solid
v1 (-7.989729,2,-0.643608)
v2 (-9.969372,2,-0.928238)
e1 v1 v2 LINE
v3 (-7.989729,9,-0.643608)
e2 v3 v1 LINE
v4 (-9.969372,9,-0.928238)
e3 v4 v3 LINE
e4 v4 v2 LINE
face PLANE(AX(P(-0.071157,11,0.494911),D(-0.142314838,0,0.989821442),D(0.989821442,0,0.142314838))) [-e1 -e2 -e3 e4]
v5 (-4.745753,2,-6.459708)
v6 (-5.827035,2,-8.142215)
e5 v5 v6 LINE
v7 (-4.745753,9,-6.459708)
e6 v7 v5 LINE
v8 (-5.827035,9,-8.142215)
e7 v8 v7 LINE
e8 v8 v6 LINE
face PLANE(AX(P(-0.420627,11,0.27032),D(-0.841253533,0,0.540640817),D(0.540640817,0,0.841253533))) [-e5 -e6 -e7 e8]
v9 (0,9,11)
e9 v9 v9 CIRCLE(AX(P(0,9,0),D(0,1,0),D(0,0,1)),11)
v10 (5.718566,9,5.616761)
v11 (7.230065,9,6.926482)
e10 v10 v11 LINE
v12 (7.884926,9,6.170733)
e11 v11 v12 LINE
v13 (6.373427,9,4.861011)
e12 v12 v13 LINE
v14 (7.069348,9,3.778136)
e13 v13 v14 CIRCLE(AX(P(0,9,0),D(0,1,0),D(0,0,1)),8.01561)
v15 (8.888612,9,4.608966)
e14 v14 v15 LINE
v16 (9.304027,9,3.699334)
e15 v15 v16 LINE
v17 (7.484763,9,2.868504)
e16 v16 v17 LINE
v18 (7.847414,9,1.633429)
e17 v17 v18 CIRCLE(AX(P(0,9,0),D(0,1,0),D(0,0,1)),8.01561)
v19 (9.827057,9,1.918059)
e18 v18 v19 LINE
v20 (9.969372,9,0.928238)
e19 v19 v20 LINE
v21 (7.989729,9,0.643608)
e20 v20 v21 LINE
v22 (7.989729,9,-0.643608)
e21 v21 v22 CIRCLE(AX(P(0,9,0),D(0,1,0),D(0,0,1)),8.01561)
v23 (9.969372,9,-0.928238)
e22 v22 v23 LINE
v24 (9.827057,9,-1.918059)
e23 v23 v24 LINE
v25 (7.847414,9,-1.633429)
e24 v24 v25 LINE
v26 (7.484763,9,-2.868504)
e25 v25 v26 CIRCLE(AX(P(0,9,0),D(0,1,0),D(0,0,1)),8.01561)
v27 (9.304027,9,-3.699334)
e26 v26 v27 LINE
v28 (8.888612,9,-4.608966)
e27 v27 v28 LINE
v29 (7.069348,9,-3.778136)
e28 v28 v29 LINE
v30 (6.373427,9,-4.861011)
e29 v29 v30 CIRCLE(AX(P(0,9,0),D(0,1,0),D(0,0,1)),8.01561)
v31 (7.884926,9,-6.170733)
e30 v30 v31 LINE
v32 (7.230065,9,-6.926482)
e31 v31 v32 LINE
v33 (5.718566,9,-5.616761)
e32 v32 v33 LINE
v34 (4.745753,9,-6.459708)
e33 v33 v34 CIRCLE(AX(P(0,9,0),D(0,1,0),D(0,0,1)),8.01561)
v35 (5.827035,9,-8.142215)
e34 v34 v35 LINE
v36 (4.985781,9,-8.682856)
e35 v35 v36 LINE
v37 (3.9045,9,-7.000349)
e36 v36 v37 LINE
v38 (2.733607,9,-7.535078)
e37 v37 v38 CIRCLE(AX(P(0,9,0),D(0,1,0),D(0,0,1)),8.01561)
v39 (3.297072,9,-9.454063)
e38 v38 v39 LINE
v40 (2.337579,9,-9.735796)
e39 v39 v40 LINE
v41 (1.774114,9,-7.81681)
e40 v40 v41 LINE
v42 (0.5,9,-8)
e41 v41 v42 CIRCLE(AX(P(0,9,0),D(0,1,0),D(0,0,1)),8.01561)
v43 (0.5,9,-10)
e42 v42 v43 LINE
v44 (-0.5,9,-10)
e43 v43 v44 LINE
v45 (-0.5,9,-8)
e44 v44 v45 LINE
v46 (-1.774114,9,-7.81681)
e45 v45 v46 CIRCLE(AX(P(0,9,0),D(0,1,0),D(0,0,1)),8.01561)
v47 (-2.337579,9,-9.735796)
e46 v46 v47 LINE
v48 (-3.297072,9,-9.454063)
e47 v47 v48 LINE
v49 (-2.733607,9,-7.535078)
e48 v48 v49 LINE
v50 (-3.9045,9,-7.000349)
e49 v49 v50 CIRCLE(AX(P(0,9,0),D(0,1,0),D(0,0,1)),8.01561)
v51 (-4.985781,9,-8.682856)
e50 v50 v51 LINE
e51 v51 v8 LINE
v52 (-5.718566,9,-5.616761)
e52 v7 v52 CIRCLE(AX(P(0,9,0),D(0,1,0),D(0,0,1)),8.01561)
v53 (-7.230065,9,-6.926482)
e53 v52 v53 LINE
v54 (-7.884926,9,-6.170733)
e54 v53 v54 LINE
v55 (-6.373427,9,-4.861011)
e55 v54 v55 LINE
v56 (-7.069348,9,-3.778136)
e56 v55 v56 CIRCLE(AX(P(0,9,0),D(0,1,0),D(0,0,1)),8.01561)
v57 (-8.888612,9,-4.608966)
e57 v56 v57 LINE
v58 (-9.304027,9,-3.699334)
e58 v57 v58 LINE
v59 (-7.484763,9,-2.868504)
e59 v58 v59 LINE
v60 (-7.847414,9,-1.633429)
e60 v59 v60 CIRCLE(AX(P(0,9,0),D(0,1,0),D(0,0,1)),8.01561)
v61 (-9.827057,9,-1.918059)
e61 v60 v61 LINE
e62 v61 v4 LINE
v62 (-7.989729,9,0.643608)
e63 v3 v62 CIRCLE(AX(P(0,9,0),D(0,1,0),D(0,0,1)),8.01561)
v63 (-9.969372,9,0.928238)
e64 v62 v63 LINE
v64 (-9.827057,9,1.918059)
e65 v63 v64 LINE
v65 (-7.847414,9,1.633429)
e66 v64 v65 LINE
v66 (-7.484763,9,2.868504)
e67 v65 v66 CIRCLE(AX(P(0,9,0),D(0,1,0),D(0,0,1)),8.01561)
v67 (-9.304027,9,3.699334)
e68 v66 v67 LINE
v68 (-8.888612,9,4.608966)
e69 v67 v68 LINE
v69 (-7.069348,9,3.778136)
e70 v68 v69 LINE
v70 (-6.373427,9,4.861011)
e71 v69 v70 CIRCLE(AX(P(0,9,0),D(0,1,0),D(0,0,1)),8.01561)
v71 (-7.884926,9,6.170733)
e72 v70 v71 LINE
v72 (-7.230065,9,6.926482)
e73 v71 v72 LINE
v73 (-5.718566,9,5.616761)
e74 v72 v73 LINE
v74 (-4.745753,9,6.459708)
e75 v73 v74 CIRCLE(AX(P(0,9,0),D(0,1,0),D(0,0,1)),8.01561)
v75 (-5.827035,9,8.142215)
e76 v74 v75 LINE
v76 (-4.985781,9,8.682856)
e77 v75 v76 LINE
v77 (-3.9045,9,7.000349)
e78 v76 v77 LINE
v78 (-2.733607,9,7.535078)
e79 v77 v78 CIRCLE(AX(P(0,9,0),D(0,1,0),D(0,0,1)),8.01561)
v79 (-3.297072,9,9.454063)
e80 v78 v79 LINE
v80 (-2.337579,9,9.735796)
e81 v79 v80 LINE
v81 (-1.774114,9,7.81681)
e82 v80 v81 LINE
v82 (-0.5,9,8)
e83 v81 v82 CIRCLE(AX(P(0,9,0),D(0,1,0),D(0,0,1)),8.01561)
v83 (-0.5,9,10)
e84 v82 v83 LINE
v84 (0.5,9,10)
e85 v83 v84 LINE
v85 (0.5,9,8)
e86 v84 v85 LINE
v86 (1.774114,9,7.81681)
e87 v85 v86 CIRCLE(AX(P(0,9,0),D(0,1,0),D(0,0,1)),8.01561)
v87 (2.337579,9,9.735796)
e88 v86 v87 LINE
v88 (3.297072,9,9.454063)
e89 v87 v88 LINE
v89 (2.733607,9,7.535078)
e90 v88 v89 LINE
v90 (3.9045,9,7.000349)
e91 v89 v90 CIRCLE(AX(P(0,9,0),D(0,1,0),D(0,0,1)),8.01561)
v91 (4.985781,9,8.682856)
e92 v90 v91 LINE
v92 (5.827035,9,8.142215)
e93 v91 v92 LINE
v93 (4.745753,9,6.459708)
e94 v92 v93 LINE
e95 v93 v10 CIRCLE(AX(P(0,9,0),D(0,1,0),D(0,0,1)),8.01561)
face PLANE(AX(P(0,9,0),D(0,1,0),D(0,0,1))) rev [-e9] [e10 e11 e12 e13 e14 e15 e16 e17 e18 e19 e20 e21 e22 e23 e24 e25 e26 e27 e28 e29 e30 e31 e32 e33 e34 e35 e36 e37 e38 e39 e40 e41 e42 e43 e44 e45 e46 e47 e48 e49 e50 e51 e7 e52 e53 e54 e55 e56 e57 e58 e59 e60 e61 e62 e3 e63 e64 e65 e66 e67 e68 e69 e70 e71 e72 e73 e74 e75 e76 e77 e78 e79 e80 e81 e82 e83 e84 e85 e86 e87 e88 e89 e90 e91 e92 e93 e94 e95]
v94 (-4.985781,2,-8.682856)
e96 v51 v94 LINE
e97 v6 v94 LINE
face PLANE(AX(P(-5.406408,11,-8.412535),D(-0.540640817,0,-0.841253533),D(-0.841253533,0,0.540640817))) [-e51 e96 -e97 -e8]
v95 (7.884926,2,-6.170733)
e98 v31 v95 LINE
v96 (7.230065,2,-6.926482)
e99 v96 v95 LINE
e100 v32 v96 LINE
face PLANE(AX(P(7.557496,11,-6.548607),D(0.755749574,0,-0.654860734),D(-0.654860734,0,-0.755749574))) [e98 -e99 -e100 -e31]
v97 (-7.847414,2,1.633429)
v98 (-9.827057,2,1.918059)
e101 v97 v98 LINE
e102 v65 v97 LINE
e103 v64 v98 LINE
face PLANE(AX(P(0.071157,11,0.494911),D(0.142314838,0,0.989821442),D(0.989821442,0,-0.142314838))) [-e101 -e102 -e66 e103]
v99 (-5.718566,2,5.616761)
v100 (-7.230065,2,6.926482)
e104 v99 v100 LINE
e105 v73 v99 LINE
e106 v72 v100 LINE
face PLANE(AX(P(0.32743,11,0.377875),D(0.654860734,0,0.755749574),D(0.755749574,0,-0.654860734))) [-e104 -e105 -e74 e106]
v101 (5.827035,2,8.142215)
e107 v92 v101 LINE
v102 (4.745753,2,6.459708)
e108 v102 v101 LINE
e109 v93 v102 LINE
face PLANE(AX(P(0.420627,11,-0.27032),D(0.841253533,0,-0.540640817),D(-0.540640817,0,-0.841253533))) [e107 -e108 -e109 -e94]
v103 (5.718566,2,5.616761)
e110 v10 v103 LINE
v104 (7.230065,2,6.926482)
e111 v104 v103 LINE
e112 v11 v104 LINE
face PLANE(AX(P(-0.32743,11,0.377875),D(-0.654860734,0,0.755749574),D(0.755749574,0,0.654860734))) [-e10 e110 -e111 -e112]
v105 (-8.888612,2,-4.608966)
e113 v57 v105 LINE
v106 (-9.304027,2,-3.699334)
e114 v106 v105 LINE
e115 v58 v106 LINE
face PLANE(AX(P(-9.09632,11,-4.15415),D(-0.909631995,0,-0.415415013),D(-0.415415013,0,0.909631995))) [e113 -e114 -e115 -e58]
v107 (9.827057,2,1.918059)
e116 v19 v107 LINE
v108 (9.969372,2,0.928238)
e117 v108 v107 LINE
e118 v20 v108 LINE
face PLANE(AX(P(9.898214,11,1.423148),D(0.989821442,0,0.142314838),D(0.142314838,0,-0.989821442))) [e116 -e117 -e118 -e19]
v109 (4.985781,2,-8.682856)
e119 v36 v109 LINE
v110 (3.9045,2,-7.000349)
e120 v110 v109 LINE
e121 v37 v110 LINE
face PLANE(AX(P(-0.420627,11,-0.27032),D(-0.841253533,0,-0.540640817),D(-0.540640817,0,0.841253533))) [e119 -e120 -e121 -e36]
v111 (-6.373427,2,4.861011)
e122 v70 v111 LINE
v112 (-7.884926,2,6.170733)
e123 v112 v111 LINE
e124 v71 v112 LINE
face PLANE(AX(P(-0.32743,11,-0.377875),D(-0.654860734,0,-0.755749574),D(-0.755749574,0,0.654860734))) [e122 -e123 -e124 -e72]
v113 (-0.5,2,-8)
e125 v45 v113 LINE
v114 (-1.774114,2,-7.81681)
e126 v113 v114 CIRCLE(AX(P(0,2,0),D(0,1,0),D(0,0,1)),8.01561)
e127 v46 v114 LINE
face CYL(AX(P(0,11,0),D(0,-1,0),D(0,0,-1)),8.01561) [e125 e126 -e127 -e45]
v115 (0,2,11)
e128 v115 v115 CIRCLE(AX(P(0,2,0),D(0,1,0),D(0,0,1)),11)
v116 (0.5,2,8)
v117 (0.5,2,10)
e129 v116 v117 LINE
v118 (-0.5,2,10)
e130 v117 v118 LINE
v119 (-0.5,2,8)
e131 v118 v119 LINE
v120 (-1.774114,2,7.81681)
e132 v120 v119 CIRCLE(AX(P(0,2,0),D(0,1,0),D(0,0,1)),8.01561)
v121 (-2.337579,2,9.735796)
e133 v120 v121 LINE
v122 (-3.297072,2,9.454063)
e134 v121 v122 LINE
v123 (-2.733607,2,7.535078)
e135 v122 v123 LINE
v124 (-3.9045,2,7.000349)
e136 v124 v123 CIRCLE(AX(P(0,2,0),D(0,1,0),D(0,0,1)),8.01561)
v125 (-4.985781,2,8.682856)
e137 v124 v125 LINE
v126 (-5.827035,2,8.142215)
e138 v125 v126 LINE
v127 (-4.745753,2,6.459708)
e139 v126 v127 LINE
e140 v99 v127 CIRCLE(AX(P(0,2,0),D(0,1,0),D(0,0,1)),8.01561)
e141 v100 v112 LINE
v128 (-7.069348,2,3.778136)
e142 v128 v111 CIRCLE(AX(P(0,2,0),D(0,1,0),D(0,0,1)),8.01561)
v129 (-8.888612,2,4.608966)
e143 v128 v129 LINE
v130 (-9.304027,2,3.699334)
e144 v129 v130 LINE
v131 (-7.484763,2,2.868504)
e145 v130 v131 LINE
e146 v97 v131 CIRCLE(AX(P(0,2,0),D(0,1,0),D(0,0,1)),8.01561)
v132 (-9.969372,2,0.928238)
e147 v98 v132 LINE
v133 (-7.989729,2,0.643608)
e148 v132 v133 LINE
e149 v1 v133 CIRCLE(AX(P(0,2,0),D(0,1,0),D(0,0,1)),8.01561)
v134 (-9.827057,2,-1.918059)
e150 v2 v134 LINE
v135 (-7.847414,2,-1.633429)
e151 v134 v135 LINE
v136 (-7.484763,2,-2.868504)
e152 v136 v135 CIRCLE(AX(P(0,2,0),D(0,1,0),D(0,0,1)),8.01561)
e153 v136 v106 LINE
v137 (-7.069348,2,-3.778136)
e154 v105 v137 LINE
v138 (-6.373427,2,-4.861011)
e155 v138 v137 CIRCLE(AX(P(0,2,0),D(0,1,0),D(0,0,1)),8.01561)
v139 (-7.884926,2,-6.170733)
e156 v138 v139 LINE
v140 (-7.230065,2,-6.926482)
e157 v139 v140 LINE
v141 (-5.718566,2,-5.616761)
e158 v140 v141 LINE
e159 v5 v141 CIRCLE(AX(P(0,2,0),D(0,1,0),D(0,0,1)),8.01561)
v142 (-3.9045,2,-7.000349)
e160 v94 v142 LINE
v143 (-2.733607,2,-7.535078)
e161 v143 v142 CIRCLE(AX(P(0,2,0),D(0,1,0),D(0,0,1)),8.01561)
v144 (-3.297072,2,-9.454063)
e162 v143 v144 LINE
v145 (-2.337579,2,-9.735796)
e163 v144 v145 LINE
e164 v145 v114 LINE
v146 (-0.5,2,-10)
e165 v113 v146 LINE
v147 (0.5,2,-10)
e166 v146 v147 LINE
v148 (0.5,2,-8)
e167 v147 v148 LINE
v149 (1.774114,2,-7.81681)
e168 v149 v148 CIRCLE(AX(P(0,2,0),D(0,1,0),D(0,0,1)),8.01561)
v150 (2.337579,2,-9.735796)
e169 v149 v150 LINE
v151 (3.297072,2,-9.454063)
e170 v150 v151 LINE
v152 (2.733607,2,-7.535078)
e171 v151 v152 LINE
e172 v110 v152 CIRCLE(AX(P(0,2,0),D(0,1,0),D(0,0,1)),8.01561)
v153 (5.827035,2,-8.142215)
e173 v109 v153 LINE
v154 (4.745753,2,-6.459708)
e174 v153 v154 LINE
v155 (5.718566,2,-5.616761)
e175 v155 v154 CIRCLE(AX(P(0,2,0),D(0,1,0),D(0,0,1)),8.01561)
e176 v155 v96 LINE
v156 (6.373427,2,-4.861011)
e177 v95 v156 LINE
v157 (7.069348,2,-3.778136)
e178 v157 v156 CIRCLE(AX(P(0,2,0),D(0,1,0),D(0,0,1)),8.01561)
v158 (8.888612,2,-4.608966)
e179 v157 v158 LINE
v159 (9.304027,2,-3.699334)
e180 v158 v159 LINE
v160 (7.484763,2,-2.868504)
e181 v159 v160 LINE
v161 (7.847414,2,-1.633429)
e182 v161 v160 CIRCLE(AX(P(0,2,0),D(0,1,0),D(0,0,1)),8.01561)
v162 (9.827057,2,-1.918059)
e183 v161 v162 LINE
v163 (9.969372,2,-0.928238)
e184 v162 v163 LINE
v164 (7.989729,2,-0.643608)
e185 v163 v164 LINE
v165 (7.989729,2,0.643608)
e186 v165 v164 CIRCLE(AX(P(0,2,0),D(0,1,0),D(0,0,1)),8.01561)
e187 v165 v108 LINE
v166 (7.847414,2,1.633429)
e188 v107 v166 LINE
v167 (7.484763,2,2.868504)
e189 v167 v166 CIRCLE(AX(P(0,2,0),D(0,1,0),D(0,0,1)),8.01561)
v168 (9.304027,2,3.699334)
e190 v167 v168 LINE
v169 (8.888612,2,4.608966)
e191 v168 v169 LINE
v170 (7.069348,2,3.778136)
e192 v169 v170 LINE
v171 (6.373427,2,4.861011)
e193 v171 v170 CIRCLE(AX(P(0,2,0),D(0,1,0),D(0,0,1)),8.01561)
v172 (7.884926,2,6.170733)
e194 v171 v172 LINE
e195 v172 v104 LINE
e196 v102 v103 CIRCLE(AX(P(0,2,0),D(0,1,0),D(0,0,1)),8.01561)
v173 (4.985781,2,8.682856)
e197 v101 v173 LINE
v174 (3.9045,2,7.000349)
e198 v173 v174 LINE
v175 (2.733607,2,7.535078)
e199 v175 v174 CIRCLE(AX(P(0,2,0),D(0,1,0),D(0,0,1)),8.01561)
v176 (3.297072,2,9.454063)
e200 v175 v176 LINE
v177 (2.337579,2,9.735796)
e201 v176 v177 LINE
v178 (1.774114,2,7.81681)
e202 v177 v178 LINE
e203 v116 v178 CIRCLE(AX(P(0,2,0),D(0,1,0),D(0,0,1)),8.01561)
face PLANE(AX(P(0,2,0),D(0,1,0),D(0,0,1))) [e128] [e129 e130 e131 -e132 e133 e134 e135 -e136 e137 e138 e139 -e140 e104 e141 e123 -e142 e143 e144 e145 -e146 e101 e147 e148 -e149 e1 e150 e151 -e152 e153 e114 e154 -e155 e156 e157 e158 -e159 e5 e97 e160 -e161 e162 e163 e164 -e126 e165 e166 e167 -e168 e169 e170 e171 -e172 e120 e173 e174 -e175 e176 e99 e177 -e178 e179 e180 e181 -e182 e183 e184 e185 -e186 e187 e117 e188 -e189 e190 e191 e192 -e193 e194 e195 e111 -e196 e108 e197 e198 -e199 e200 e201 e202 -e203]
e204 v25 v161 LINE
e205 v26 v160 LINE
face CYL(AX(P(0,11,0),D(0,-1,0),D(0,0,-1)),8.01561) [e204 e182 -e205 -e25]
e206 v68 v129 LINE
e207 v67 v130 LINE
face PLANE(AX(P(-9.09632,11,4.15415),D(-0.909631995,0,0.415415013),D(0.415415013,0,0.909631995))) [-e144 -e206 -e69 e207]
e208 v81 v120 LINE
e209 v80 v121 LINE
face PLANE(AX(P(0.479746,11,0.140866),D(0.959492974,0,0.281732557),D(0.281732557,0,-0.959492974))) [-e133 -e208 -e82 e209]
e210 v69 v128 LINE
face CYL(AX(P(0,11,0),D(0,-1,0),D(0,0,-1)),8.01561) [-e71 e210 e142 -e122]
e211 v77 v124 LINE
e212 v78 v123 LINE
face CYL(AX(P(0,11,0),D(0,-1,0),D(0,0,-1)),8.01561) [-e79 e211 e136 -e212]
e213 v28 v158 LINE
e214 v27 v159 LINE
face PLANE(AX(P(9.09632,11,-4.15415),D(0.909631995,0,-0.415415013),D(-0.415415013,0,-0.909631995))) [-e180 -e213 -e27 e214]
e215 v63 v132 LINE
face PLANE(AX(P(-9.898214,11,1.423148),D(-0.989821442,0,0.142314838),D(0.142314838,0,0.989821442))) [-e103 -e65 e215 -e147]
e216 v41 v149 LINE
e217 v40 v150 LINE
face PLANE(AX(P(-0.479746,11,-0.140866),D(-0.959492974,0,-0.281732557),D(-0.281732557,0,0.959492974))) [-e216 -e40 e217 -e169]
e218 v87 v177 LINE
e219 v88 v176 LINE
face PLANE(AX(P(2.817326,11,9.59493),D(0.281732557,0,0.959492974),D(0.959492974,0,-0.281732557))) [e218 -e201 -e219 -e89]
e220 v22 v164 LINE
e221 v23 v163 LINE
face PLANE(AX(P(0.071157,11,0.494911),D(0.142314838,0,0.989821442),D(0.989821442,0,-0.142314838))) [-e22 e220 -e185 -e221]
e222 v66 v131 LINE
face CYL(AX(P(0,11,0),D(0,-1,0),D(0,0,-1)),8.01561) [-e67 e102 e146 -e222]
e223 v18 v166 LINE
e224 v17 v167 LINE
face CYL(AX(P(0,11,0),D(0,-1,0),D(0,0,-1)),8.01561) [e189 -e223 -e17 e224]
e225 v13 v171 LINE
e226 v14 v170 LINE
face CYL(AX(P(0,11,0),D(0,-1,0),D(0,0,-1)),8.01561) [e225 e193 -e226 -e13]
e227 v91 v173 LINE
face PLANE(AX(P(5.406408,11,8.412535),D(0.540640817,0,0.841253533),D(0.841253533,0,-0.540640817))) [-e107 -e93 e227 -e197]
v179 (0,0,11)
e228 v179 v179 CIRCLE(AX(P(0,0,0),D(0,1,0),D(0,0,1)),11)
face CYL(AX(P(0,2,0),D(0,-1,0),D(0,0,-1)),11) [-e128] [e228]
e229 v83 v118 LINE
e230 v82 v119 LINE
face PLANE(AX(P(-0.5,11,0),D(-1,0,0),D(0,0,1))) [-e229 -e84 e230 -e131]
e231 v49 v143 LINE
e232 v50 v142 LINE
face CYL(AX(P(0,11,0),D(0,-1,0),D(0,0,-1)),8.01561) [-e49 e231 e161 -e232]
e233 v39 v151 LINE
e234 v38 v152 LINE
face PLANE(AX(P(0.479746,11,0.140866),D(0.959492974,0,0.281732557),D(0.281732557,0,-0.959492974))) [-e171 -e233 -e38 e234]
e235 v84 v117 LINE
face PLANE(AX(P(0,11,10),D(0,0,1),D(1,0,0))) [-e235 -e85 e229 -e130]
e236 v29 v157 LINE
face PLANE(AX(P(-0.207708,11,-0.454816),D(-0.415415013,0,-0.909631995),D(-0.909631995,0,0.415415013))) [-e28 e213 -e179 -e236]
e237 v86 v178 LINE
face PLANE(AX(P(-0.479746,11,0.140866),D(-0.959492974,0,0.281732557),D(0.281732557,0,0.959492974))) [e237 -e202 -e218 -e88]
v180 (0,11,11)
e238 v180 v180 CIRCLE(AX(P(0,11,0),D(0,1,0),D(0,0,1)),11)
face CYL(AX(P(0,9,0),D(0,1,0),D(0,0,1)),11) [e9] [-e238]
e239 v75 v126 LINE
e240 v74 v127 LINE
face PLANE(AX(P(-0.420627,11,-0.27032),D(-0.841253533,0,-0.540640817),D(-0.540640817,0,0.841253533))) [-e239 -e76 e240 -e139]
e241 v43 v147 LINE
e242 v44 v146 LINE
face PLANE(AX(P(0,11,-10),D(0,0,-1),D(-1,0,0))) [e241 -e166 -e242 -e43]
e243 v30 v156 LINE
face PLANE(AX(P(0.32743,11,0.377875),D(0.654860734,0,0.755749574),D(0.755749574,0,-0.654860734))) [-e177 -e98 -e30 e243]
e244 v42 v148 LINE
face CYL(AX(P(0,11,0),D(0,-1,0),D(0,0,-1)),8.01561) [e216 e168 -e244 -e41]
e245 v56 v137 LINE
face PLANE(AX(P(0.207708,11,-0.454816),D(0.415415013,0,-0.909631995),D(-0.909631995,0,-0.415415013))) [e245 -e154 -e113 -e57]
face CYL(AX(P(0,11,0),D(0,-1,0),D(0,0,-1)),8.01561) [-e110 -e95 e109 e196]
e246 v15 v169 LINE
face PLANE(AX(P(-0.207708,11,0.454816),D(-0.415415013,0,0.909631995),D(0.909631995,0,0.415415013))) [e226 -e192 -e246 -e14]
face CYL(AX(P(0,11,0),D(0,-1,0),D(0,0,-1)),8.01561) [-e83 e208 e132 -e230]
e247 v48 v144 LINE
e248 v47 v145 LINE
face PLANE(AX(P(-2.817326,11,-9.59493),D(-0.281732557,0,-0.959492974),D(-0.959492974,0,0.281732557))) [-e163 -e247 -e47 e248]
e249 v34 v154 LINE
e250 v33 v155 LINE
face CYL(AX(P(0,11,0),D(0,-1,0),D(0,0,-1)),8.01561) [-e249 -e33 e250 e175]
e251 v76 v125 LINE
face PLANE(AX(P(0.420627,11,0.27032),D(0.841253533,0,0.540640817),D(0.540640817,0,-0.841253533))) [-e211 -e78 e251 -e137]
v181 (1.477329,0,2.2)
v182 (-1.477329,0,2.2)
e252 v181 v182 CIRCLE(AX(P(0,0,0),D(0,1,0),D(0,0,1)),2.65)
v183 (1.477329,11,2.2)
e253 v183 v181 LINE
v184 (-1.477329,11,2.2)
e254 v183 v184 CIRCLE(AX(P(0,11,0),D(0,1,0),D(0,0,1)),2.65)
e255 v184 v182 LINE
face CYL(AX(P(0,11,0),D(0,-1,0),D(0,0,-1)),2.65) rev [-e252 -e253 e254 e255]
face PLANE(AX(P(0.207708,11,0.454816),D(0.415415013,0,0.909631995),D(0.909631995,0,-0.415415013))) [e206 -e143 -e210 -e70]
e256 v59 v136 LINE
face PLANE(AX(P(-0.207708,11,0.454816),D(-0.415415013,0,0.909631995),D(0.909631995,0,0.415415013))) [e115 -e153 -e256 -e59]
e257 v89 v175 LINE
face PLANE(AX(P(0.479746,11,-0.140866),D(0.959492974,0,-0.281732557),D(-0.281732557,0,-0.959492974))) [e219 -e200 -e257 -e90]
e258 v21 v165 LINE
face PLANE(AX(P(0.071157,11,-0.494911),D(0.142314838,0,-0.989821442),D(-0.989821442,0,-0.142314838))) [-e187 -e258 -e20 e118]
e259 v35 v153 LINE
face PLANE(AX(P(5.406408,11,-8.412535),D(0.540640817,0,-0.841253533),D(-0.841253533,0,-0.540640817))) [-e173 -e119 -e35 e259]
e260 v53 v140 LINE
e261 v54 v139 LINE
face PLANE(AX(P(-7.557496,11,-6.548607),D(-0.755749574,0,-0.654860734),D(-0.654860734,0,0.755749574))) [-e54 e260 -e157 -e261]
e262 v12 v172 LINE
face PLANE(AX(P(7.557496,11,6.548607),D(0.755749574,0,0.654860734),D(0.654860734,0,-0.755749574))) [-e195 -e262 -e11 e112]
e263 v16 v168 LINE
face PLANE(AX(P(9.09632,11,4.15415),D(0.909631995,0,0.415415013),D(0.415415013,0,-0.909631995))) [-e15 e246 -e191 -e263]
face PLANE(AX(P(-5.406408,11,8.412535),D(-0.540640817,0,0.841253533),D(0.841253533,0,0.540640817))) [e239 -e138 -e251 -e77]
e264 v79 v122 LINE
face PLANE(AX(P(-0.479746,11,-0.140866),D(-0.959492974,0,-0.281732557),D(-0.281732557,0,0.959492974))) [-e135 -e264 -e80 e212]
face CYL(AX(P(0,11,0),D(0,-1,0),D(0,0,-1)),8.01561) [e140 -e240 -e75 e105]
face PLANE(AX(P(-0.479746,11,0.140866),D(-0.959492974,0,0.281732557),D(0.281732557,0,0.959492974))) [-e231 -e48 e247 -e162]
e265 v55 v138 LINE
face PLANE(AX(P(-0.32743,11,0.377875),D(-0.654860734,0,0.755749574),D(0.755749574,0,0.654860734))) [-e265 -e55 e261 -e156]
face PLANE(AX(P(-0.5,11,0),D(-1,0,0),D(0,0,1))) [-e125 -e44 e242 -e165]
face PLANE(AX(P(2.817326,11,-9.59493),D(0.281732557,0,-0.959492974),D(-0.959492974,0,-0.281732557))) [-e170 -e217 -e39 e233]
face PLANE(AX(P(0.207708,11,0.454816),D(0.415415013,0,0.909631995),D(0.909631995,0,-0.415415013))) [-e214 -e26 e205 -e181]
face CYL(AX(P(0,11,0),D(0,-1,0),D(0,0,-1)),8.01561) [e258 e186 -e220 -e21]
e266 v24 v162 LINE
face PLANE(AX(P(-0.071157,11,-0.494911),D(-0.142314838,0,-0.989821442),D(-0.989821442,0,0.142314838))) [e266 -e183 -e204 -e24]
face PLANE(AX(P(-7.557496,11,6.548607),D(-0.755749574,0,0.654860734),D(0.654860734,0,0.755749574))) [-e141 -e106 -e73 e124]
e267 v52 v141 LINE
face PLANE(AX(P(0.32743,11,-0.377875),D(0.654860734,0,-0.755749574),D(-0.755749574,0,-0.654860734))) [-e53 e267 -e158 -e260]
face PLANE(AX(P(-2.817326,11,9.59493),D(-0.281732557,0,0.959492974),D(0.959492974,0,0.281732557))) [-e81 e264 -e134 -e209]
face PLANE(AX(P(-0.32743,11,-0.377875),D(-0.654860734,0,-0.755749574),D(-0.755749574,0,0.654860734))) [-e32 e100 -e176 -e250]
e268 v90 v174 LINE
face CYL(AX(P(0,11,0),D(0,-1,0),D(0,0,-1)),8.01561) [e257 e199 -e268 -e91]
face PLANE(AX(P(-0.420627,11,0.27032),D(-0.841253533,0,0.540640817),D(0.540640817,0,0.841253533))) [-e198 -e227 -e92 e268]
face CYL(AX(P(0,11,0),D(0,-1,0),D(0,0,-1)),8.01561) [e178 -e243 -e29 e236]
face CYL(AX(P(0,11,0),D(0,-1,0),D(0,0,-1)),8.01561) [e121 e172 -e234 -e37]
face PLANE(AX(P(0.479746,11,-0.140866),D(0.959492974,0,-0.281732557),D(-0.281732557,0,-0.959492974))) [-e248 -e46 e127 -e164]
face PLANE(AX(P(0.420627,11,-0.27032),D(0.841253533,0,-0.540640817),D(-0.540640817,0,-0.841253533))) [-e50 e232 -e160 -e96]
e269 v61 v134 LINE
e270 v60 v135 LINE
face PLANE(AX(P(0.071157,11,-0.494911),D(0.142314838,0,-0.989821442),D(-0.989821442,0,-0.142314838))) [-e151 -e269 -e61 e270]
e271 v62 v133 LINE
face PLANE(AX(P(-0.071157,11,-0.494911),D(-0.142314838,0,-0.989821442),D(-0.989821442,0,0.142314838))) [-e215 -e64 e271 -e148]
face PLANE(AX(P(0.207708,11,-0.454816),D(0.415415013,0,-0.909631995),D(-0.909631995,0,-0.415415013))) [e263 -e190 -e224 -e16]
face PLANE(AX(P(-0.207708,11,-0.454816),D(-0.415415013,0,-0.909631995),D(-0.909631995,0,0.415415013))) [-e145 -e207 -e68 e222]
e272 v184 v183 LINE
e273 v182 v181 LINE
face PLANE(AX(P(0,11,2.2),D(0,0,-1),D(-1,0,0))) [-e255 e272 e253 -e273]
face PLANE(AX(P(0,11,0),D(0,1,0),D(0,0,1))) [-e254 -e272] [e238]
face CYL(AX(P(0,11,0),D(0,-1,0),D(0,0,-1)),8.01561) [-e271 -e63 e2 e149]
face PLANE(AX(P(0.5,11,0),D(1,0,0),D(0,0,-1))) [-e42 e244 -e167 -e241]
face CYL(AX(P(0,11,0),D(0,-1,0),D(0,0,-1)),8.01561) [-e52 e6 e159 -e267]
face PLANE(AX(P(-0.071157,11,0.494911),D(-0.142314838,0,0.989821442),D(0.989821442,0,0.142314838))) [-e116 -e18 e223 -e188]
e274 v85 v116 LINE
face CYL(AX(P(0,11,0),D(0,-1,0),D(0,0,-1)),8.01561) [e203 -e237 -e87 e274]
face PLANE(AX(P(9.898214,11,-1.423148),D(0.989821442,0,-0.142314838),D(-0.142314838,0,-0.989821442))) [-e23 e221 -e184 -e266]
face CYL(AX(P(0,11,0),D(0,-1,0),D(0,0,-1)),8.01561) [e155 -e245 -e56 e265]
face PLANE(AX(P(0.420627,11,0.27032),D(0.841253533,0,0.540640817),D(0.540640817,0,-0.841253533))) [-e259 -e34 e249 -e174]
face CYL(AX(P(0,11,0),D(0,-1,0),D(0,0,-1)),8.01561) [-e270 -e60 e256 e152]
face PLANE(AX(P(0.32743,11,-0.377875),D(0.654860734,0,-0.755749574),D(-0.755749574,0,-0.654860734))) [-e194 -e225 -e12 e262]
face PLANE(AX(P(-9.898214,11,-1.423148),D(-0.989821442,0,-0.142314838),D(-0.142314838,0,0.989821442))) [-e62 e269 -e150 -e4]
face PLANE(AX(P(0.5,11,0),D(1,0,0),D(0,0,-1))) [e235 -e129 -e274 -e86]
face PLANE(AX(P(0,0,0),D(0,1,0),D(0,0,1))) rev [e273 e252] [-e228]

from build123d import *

# Parameters (mm, degrees)
BOSS_EXTRUDE1_DEPTH = 11
BOSS_EXTRUDE2_DEPTH = 2
BOSS_EXTRUDE3_START = 9
BOSS_EXTRUDE3_DEPTH = 2


# Read off the part's stored shape, not the designer's step: Boss-Extrude1
with BuildPart() as part:
    # Boss-Extrude1 outline → Boss-Extrude1 (new body)
    with BuildSketch(Plane(origin=(0, 0, 0), x_dir=(1, 0, 0), z_dir=(0, 1, 0))):
        with BuildLine():
            Line((-0.5, -8), (-0.5, -10))
            Line((-0.5, -10), (0.5, -10))
            Line((0.5, -10), (0.5, -8))
            ThreePointArc((0.5, -8), (1.140740208, -7.934022421), (1.774113968, -7.816810067))
            Line((1.774113968, -7.816810067), (2.337579082, -9.735796015))
            Line((2.337579082, -9.735796015), (3.297072055, -9.454063458))
            Line((3.297072055, -9.454063458), (2.733606942, -7.53507751))
            ThreePointArc((2.733606942, -7.53507751), (3.329804637, -7.29125511), (3.904499773, -7.000348671))
            Line((3.904499773, -7.000348671), (4.985781408, -8.682855737))
            Line((4.985781408, -8.682855737), (5.827034941, -8.14221492))
            Line((5.827034941, -8.14221492), (4.745753306, -6.459707854))
            ThreePointArc((4.745753306, -6.459707854), (5.249108098, -6.057793673), (5.718566228, -5.616760659))
            Line((5.718566228, -5.616760659), (7.230065377, -6.926482127))
            Line((7.230065377, -6.926482127), (7.884926111, -6.170732552))
            Line((7.884926111, -6.170732552), (6.373426962, -4.861011084))
            ThreePointArc((6.373426962, -4.861011084), (6.743160038, -4.333565819), (7.069348456, -3.778136102))
            Line((7.069348456, -3.778136102), (8.888612447, -4.608966128))
            Line((8.888612447, -4.608966128), (9.30402746, -3.699334132))
            Line((9.30402746, -3.699334132), (7.484763469, -2.868504106))
            ThreePointArc((7.484763469, -2.868504106), (7.690921254, -2.258258235), (7.847414116, -1.633429427))
            Line((7.847414116, -1.633429427), (9.827057, -1.918059104))
            Line((9.827057, -1.918059104), (9.969371838, -0.928237662))
            Line((9.969371838, -0.928237662), (7.989728954, -0.643607985))
            ThreePointArc((7.989728954, -0.643607985), (8.015609771, 0), (7.989728954, 0.643607985))
            Line((7.989728954, 0.643607985), (9.969371838, 0.928237662))
            Line((9.969371838, 0.928237662), (9.827057, 1.918059104))
            Line((9.827057, 1.918059104), (7.847414116, 1.633429427))
            ThreePointArc((7.847414116, 1.633429427), (7.690921254, 2.258258235), (7.484763469, 2.868504106))
            Line((7.484763469, 2.868504106), (9.30402746, 3.699334132))
            Line((9.30402746, 3.699334132), (8.888612447, 4.608966128))
            Line((8.888612447, 4.608966128), (7.069348456, 3.778136102))
            ThreePointArc((7.069348456, 3.778136102), (6.743160038, 4.333565819), (6.373426962, 4.861011084))
            Line((6.373426962, 4.861011084), (7.884926111, 6.170732552))
            Line((7.884926111, 6.170732552), (7.230065377, 6.926482127))
            Line((7.230065377, 6.926482127), (5.718566228, 5.616760659))
            ThreePointArc((5.718566228, 5.616760659), (5.249108098, 6.057793673), (4.745753306, 6.459707854))
            Line((4.745753306, 6.459707854), (5.827034941, 8.14221492))
            Line((5.827034941, 8.14221492), (4.985781408, 8.682855737))
            Line((4.985781408, 8.682855737), (3.904499773, 7.000348671))
            ThreePointArc((3.904499773, 7.000348671), (3.329804637, 7.29125511), (2.733606942, 7.53507751))
            Line((2.733606942, 7.53507751), (3.297072055, 9.454063458))
            Line((3.297072055, 9.454063458), (2.337579082, 9.735796015))
            Line((2.337579082, 9.735796015), (1.774113968, 7.816810067))
            ThreePointArc((1.774113968, 7.816810067), (1.140740208, 7.934022421), (0.5, 8))
            Line((0.5, 8), (0.5, 10))
            Line((0.5, 10), (-0.5, 10))
            Line((-0.5, 10), (-0.5, 8))
            ThreePointArc((-0.5, 8), (-1.140740208, 7.934022421), (-1.774113968, 7.816810067))
            Line((-1.774113968, 7.816810067), (-2.337579082, 9.735796015))
            Line((-2.337579082, 9.735796015), (-3.297072055, 9.454063458))
            Line((-3.297072055, 9.454063458), (-2.733606942, 7.53507751))
            ThreePointArc((-2.733606942, 7.53507751), (-3.329804637, 7.29125511), (-3.904499773, 7.000348671))
            Line((-3.904499773, 7.000348671), (-4.985781408, 8.682855737))
            Line((-4.985781408, 8.682855737), (-5.827034941, 8.14221492))
            Line((-5.827034941, 8.14221492), (-4.745753306, 6.459707854))
            ThreePointArc((-4.745753306, 6.459707854), (-5.249108098, 6.057793673), (-5.718566228, 5.616760659))
            Line((-5.718566228, 5.616760659), (-7.230065377, 6.926482127))
            Line((-7.230065377, 6.926482127), (-7.884926111, 6.170732552))
            Line((-7.884926111, 6.170732552), (-6.373426962, 4.861011084))
            ThreePointArc((-6.373426962, 4.861011084), (-6.743160038, 4.333565819), (-7.069348456, 3.778136102))
            Line((-7.069348456, 3.778136102), (-8.888612447, 4.608966128))
            Line((-8.888612447, 4.608966128), (-9.30402746, 3.699334132))
            Line((-9.30402746, 3.699334132), (-7.484763469, 2.868504106))
            ThreePointArc((-7.484763469, 2.868504106), (-7.690921254, 2.258258235), (-7.847414116, 1.633429427))
            Line((-7.847414116, 1.633429427), (-9.827057, 1.918059104))
            Line((-9.827057, 1.918059104), (-9.969371838, 0.928237662))
            Line((-9.969371838, 0.928237662), (-7.989728954, 0.643607985))
            ThreePointArc((-7.989728954, 0.643607985), (-8.015609771, 0), (-7.989728954, -0.643607985))
            Line((-7.989728954, -0.643607985), (-9.969371838, -0.928237662))
            Line((-9.969371838, -0.928237662), (-9.827057, -1.918059104))
            Line((-9.827057, -1.918059104), (-7.847414116, -1.633429427))
            ThreePointArc((-7.847414116, -1.633429427), (-7.690921254, -2.258258235), (-7.484763469, -2.868504106))
            Line((-7.484763469, -2.868504106), (-9.30402746, -3.699334132))
            Line((-9.30402746, -3.699334132), (-8.888612447, -4.608966128))
            Line((-8.888612447, -4.608966128), (-7.069348456, -3.778136102))
            ThreePointArc((-7.069348456, -3.778136102), (-6.743160038, -4.333565819), (-6.373426962, -4.861011084))
            Line((-6.373426962, -4.861011084), (-7.884926111, -6.170732552))
            Line((-7.884926111, -6.170732552), (-7.230065377, -6.926482127))
            Line((-7.230065377, -6.926482127), (-5.718566228, -5.616760659))
            ThreePointArc((-5.718566228, -5.616760659), (-5.249108098, -6.057793673), (-4.745753306, -6.459707854))
            Line((-4.745753306, -6.459707854), (-5.827034941, -8.14221492))
            Line((-5.827034941, -8.14221492), (-4.985781408, -8.682855737))
            Line((-4.985781408, -8.682855737), (-3.904499773, -7.000348671))
            ThreePointArc((-3.904499773, -7.000348671), (-3.329804637, -7.29125511), (-2.733606942, -7.53507751))
            Line((-2.733606942, -7.53507751), (-3.297072055, -9.454063458))
            Line((-3.297072055, -9.454063458), (-2.337579082, -9.735796015))
            Line((-2.337579082, -9.735796015), (-1.774113968, -7.816810067))
            ThreePointArc((-1.774113968, -7.816810067), (-1.140740208, -7.934022421), (-0.5, -8))
        make_face()
        with BuildLine():
            Line((1.47732867, -2.2), (-1.47732867, -2.2))
            ThreePointArc((-1.47732867, -2.2), (0, 2.65), (1.47732867, -2.2))
        make_face(mode=Mode.SUBTRACT)
    extrude(amount=BOSS_EXTRUDE1_DEPTH)

    # Sketch1<6> → Boss-Extrude2 (add)
    with BuildSketch(Plane(origin=(0, 0, 0), x_dir=(1, 0, 0), z_dir=(0, 1, 0))):
        with BuildLine():
            Line((0, 10), (0, 11))
            ThreePointArc((0, 11), (-11, 0), (0, -11))
            Line((0, -11), (0, -10))
            Line((0, -10), (-0.5, -10))
            Line((-0.5, -10), (-0.5, -8))
            ThreePointArc((-0.5, -8), (-1.140740208, -7.934022421), (-1.774113968, -7.816810067))
            Line((-1.774113968, -7.816810067), (-2.337579082, -9.735796015))
            Line((-2.337579082, -9.735796015), (-3.297072055, -9.454063458))
            Line((-3.297072055, -9.454063458), (-2.733606942, -7.53507751))
            ThreePointArc((-2.733606942, -7.53507751), (-3.329804637, -7.29125511), (-3.904499773, -7.000348671))
            Line((-3.904499773, -7.000348671), (-4.985781408, -8.682855737))
            Line((-4.985781408, -8.682855737), (-5.827034941, -8.14221492))
            Line((-5.827034941, -8.14221492), (-4.745753306, -6.459707854))
            ThreePointArc((-4.745753306, -6.459707854), (-5.249108098, -6.057793673), (-5.718566228, -5.616760659))
            Line((-5.718566228, -5.616760659), (-7.230065377, -6.926482127))
            Line((-7.230065377, -6.926482127), (-7.884926111, -6.170732552))
            Line((-7.884926111, -6.170732552), (-6.373426962, -4.861011084))
            ThreePointArc((-6.373426962, -4.861011084), (-6.743160038, -4.333565819), (-7.069348456, -3.778136102))
            Line((-7.069348456, -3.778136102), (-8.888612447, -4.608966128))
            Line((-8.888612447, -4.608966128), (-9.30402746, -3.699334132))
            Line((-9.30402746, -3.699334132), (-7.484763469, -2.868504106))
            ThreePointArc((-7.484763469, -2.868504106), (-7.690921254, -2.258258235), (-7.847414116, -1.633429427))
            Line((-7.847414116, -1.633429427), (-9.827057, -1.918059104))
            Line((-9.827057, -1.918059104), (-9.969371838, -0.928237662))
            Line((-9.969371838, -0.928237662), (-7.989728954, -0.643607985))
            ThreePointArc((-7.989728954, -0.643607985), (-8.015609771, 0), (-7.989728954, 0.643607985))
            Line((-7.989728954, 0.643607985), (-9.969371838, 0.928237662))
            Line((-9.969371838, 0.928237662), (-9.827057, 1.918059104))
            Line((-9.827057, 1.918059104), (-7.847414116, 1.633429427))
            ThreePointArc((-7.847414116, 1.633429427), (-7.690921254, 2.258258235), (-7.484763469, 2.868504106))
            Line((-7.484763469, 2.868504106), (-9.30402746, 3.699334132))
            Line((-9.30402746, 3.699334132), (-8.888612447, 4.608966128))
            Line((-8.888612447, 4.608966128), (-7.069348456, 3.778136102))
            ThreePointArc((-7.069348456, 3.778136102), (-6.743160038, 4.333565819), (-6.373426962, 4.861011084))
            Line((-6.373426962, 4.861011084), (-7.884926111, 6.170732552))
            Line((-7.884926111, 6.170732552), (-7.230065377, 6.926482127))
            Line((-7.230065377, 6.926482127), (-5.718566228, 5.616760659))
            ThreePointArc((-5.718566228, 5.616760659), (-5.249108098, 6.057793673), (-4.745753306, 6.459707854))
            Line((-4.745753306, 6.459707854), (-5.827034941, 8.14221492))
            Line((-5.827034941, 8.14221492), (-4.985781408, 8.682855737))
            Line((-4.985781408, 8.682855737), (-3.904499773, 7.000348671))
            ThreePointArc((-3.904499773, 7.000348671), (-3.329804637, 7.29125511), (-2.733606942, 7.53507751))
            Line((-2.733606942, 7.53507751), (-3.297072055, 9.454063458))
            Line((-3.297072055, 9.454063458), (-2.337579082, 9.735796015))
            Line((-2.337579082, 9.735796015), (-1.774113968, 7.816810067))
            ThreePointArc((-1.774113968, 7.816810067), (-1.140740208, 7.934022421), (-0.5, 8))
            Line((-0.5, 8), (-0.5, 10))
            Line((-0.5, 10), (0, 10))
        make_face()
        with BuildLine():
            ThreePointArc((11, 0), (7.778174593, 7.778174593), (0, 11))
            Line((0, 11), (0, 10))
            Line((0, 10), (0.5, 10))
            Line((0.5, 10), (0.5, 8))
            ThreePointArc((0.5, 8), (1.140740208, 7.934022421), (1.774113968, 7.816810067))
            Line((1.774113968, 7.816810067), (2.337579082, 9.735796015))
            Line((2.337579082, 9.735796015), (3.297072055, 9.454063458))
            Line((3.297072055, 9.454063458), (2.733606942, 7.53507751))
            ThreePointArc((2.733606942, 7.53507751), (3.329804637, 7.29125511), (3.904499773, 7.000348671))
            Line((3.904499773, 7.000348671), (4.985781408, 8.682855737))
            Line((4.985781408, 8.682855737), (5.827034941, 8.14221492))
            Line((5.827034941, 8.14221492), (4.745753306, 6.459707854))
            ThreePointArc((4.745753306, 6.459707854), (5.249108098, 6.057793673), (5.718566228, 5.616760659))
            Line((5.718566228, 5.616760659), (7.230065377, 6.926482127))
            Line((7.230065377, 6.926482127), (7.884926111, 6.170732552))
            Line((7.884926111, 6.170732552), (6.373426962, 4.861011084))
            ThreePointArc((6.373426962, 4.861011084), (6.743160038, 4.333565819), (7.069348456, 3.778136102))
            Line((7.069348456, 3.778136102), (8.888612447, 4.608966128))
            Line((8.888612447, 4.608966128), (9.30402746, 3.699334132))
            Line((9.30402746, 3.699334132), (7.484763469, 2.868504106))
            ThreePointArc((7.484763469, 2.868504106), (7.690921254, 2.258258235), (7.847414116, 1.633429427))
            Line((7.847414116, 1.633429427), (9.827057, 1.918059104))
            Line((9.827057, 1.918059104), (9.969371838, 0.928237662))
            Line((9.969371838, 0.928237662), (7.989728954, 0.643607985))
            ThreePointArc((7.989728954, 0.643607985), (8.009136953, 0.322064068), (8.015609771, 0))
            ThreePointArc((8.015609771, 0), (8.009136953, -0.322064068), (7.989728954, -0.643607985))
            Line((7.989728954, -0.643607985), (9.969371838, -0.928237662))
            Line((9.969371838, -0.928237662), (9.827057, -1.918059104))
            Line((9.827057, -1.918059104), (7.847414116, -1.633429427))
            ThreePointArc((7.847414116, -1.633429427), (7.690921254, -2.258258235), (7.484763469, -2.868504106))
            Line((7.484763469, -2.868504106), (9.30402746, -3.699334132))
            Line((9.30402746, -3.699334132), (8.888612447, -4.608966128))
            Line((8.888612447, -4.608966128), (7.069348456, -3.778136102))
            ThreePointArc((7.069348456, -3.778136102), (6.743160038, -4.333565819), (6.373426962, -4.861011084))
            Line((6.373426962, -4.861011084), (7.884926111, -6.170732552))
            Line((7.884926111, -6.170732552), (7.230065377, -6.926482127))
            Line((7.230065377, -6.926482127), (5.718566228, -5.616760659))
            ThreePointArc((5.718566228, -5.616760659), (5.249108098, -6.057793673), (4.745753306, -6.459707854))
            Line((4.745753306, -6.459707854), (5.827034941, -8.14221492))
            Line((5.827034941, -8.14221492), (4.985781408, -8.682855737))
            Line((4.985781408, -8.682855737), (3.904499773, -7.000348671))
            ThreePointArc((3.904499773, -7.000348671), (3.329804637, -7.29125511), (2.733606942, -7.53507751))
            Line((2.733606942, -7.53507751), (3.297072055, -9.454063458))
            Line((3.297072055, -9.454063458), (2.337579082, -9.735796015))
            Line((2.337579082, -9.735796015), (1.774113968, -7.816810067))
            ThreePointArc((1.774113968, -7.816810067), (1.140740208, -7.934022421), (0.5, -8))
            Line((0.5, -8), (0.5, -10))
            Line((0.5, -10), (0, -10))
            Line((0, -10), (0, -11))
            ThreePointArc((0, -11), (7.778174593, -7.778174593), (11, 0))
        make_face()
    extrude(amount=BOSS_EXTRUDE2_DEPTH)

    # Sketch1<7> → Boss-Extrude3 (add)
    with BuildSketch(Plane(origin=(0, 0, 0), x_dir=(1, 0, 0), z_dir=(0, 1, 0)).offset(BOSS_EXTRUDE3_START)):
        with BuildLine():
            ThreePointArc((11, 0), (7.778174593, 7.778174593), (0, 11))
            Line((0, 11), (0, 10))
            Line((0, 10), (0.5, 10))
            Line((0.5, 10), (0.5, 8))
            ThreePointArc((0.5, 8), (1.140740208, 7.934022421), (1.774113968, 7.816810067))
            Line((1.774113968, 7.816810067), (2.337579082, 9.735796015))
            Line((2.337579082, 9.735796015), (3.297072055, 9.454063458))
            Line((3.297072055, 9.454063458), (2.733606942, 7.53507751))
            ThreePointArc((2.733606942, 7.53507751), (3.329804637, 7.29125511), (3.904499773, 7.000348671))
            Line((3.904499773, 7.000348671), (4.985781408, 8.682855737))
            Line((4.985781408, 8.682855737), (5.827034941, 8.14221492))
            Line((5.827034941, 8.14221492), (4.745753306, 6.459707854))
            ThreePointArc((4.745753306, 6.459707854), (5.249108098, 6.057793673), (5.718566228, 5.616760659))
            Line((5.718566228, 5.616760659), (7.230065377, 6.926482127))
            Line((7.230065377, 6.926482127), (7.884926111, 6.170732552))
            Line((7.884926111, 6.170732552), (6.373426962, 4.861011084))
            ThreePointArc((6.373426962, 4.861011084), (6.743160038, 4.333565819), (7.069348456, 3.778136102))
            Line((7.069348456, 3.778136102), (8.888612447, 4.608966128))
            Line((8.888612447, 4.608966128), (9.30402746, 3.699334132))
            Line((9.30402746, 3.699334132), (7.484763469, 2.868504106))
            ThreePointArc((7.484763469, 2.868504106), (7.690921254, 2.258258235), (7.847414116, 1.633429427))
            Line((7.847414116, 1.633429427), (9.827057, 1.918059104))
            Line((9.827057, 1.918059104), (9.969371838, 0.928237662))
            Line((9.969371838, 0.928237662), (7.989728954, 0.643607985))
            ThreePointArc((7.989728954, 0.643607985), (8.009136953, 0.322064068), (8.015609771, 0))
            ThreePointArc((8.015609771, 0), (8.009136953, -0.322064068), (7.989728954, -0.643607985))
            Line((7.989728954, -0.643607985), (9.969371838, -0.928237662))
            Line((9.969371838, -0.928237662), (9.827057, -1.918059104))
            Line((9.827057, -1.918059104), (7.847414116, -1.633429427))
            ThreePointArc((7.847414116, -1.633429427), (7.690921254, -2.258258235), (7.484763469, -2.868504106))
            Line((7.484763469, -2.868504106), (9.30402746, -3.699334132))
            Line((9.30402746, -3.699334132), (8.888612447, -4.608966128))
            Line((8.888612447, -4.608966128), (7.069348456, -3.778136102))
            ThreePointArc((7.069348456, -3.778136102), (6.743160038, -4.333565819), (6.373426962, -4.861011084))
            Line((6.373426962, -4.861011084), (7.884926111, -6.170732552))
            Line((7.884926111, -6.170732552), (7.230065377, -6.926482127))
            Line((7.230065377, -6.926482127), (5.718566228, -5.616760659))
            ThreePointArc((5.718566228, -5.616760659), (5.249108098, -6.057793673), (4.745753306, -6.459707854))
            Line((4.745753306, -6.459707854), (5.827034941, -8.14221492))
            Line((5.827034941, -8.14221492), (4.985781408, -8.682855737))
            Line((4.985781408, -8.682855737), (3.904499773, -7.000348671))
            ThreePointArc((3.904499773, -7.000348671), (3.329804637, -7.29125511), (2.733606942, -7.53507751))
            Line((2.733606942, -7.53507751), (3.297072055, -9.454063458))
            Line((3.297072055, -9.454063458), (2.337579082, -9.735796015))
            Line((2.337579082, -9.735796015), (1.774113968, -7.816810067))
            ThreePointArc((1.774113968, -7.816810067), (1.140740208, -7.934022421), (0.5, -8))
            Line((0.5, -8), (0.5, -10))
            Line((0.5, -10), (0, -10))
            Line((0, -10), (0, -11))
            ThreePointArc((0, -11), (7.778174593, -7.778174593), (11, 0))
        make_face()
        with BuildLine():
            Line((0, 10), (0, 11))
            ThreePointArc((0, 11), (-11, 0), (0, -11))
            Line((0, -11), (0, -10))
            Line((0, -10), (-0.5, -10))
            Line((-0.5, -10), (-0.5, -8))
            ThreePointArc((-0.5, -8), (-1.140740208, -7.934022421), (-1.774113968, -7.816810067))
            Line((-1.774113968, -7.816810067), (-2.337579082, -9.735796015))
            Line((-2.337579082, -9.735796015), (-3.297072055, -9.454063458))
            Line((-3.297072055, -9.454063458), (-2.733606942, -7.53507751))
            ThreePointArc((-2.733606942, -7.53507751), (-3.329804637, -7.29125511), (-3.904499773, -7.000348671))
            Line((-3.904499773, -7.000348671), (-4.985781408, -8.682855737))
            Line((-4.985781408, -8.682855737), (-5.827034941, -8.14221492))
            Line((-5.827034941, -8.14221492), (-4.745753306, -6.459707854))
            ThreePointArc((-4.745753306, -6.459707854), (-5.249108098, -6.057793673), (-5.718566228, -5.616760659))
            Line((-5.718566228, -5.616760659), (-7.230065377, -6.926482127))
            Line((-7.230065377, -6.926482127), (-7.884926111, -6.170732552))
            Line((-7.884926111, -6.170732552), (-6.373426962, -4.861011084))
            ThreePointArc((-6.373426962, -4.861011084), (-6.743160038, -4.333565819), (-7.069348456, -3.778136102))
            Line((-7.069348456, -3.778136102), (-8.888612447, -4.608966128))
            Line((-8.888612447, -4.608966128), (-9.30402746, -3.699334132))
            Line((-9.30402746, -3.699334132), (-7.484763469, -2.868504106))
            ThreePointArc((-7.484763469, -2.868504106), (-7.690921254, -2.258258235), (-7.847414116, -1.633429427))
            Line((-7.847414116, -1.633429427), (-9.827057, -1.918059104))
            Line((-9.827057, -1.918059104), (-9.969371838, -0.928237662))
            Line((-9.969371838, -0.928237662), (-7.989728954, -0.643607985))
            ThreePointArc((-7.989728954, -0.643607985), (-8.015609771, 0), (-7.989728954, 0.643607985))
            Line((-7.989728954, 0.643607985), (-9.969371838, 0.928237662))
            Line((-9.969371838, 0.928237662), (-9.827057, 1.918059104))
            Line((-9.827057, 1.918059104), (-7.847414116, 1.633429427))
            ThreePointArc((-7.847414116, 1.633429427), (-7.690921254, 2.258258235), (-7.484763469, 2.868504106))
            Line((-7.484763469, 2.868504106), (-9.30402746, 3.699334132))
            Line((-9.30402746, 3.699334132), (-8.888612447, 4.608966128))
            Line((-8.888612447, 4.608966128), (-7.069348456, 3.778136102))
            ThreePointArc((-7.069348456, 3.778136102), (-6.743160038, 4.333565819), (-6.373426962, 4.861011084))
            Line((-6.373426962, 4.861011084), (-7.884926111, 6.170732552))
            Line((-7.884926111, 6.170732552), (-7.230065377, 6.926482127))
            Line((-7.230065377, 6.926482127), (-5.718566228, 5.616760659))
            ThreePointArc((-5.718566228, 5.616760659), (-5.249108098, 6.057793673), (-4.745753306, 6.459707854))
            Line((-4.745753306, 6.459707854), (-5.827034941, 8.14221492))
            Line((-5.827034941, 8.14221492), (-4.985781408, 8.682855737))
            Line((-4.985781408, 8.682855737), (-3.904499773, 7.000348671))
            ThreePointArc((-3.904499773, 7.000348671), (-3.329804637, 7.29125511), (-2.733606942, 7.53507751))
            Line((-2.733606942, 7.53507751), (-3.297072055, 9.454063458))
            Line((-3.297072055, 9.454063458), (-2.337579082, 9.735796015))
            Line((-2.337579082, 9.735796015), (-1.774113968, 7.816810067))
            ThreePointArc((-1.774113968, 7.816810067), (-1.140740208, 7.934022421), (-0.5, 8))
            Line((-0.5, 8), (-0.5, 10))
            Line((-0.5, 10), (0, 10))
        make_face()
    extrude(amount=BOSS_EXTRUDE3_DEPTH)


solid = part.part
